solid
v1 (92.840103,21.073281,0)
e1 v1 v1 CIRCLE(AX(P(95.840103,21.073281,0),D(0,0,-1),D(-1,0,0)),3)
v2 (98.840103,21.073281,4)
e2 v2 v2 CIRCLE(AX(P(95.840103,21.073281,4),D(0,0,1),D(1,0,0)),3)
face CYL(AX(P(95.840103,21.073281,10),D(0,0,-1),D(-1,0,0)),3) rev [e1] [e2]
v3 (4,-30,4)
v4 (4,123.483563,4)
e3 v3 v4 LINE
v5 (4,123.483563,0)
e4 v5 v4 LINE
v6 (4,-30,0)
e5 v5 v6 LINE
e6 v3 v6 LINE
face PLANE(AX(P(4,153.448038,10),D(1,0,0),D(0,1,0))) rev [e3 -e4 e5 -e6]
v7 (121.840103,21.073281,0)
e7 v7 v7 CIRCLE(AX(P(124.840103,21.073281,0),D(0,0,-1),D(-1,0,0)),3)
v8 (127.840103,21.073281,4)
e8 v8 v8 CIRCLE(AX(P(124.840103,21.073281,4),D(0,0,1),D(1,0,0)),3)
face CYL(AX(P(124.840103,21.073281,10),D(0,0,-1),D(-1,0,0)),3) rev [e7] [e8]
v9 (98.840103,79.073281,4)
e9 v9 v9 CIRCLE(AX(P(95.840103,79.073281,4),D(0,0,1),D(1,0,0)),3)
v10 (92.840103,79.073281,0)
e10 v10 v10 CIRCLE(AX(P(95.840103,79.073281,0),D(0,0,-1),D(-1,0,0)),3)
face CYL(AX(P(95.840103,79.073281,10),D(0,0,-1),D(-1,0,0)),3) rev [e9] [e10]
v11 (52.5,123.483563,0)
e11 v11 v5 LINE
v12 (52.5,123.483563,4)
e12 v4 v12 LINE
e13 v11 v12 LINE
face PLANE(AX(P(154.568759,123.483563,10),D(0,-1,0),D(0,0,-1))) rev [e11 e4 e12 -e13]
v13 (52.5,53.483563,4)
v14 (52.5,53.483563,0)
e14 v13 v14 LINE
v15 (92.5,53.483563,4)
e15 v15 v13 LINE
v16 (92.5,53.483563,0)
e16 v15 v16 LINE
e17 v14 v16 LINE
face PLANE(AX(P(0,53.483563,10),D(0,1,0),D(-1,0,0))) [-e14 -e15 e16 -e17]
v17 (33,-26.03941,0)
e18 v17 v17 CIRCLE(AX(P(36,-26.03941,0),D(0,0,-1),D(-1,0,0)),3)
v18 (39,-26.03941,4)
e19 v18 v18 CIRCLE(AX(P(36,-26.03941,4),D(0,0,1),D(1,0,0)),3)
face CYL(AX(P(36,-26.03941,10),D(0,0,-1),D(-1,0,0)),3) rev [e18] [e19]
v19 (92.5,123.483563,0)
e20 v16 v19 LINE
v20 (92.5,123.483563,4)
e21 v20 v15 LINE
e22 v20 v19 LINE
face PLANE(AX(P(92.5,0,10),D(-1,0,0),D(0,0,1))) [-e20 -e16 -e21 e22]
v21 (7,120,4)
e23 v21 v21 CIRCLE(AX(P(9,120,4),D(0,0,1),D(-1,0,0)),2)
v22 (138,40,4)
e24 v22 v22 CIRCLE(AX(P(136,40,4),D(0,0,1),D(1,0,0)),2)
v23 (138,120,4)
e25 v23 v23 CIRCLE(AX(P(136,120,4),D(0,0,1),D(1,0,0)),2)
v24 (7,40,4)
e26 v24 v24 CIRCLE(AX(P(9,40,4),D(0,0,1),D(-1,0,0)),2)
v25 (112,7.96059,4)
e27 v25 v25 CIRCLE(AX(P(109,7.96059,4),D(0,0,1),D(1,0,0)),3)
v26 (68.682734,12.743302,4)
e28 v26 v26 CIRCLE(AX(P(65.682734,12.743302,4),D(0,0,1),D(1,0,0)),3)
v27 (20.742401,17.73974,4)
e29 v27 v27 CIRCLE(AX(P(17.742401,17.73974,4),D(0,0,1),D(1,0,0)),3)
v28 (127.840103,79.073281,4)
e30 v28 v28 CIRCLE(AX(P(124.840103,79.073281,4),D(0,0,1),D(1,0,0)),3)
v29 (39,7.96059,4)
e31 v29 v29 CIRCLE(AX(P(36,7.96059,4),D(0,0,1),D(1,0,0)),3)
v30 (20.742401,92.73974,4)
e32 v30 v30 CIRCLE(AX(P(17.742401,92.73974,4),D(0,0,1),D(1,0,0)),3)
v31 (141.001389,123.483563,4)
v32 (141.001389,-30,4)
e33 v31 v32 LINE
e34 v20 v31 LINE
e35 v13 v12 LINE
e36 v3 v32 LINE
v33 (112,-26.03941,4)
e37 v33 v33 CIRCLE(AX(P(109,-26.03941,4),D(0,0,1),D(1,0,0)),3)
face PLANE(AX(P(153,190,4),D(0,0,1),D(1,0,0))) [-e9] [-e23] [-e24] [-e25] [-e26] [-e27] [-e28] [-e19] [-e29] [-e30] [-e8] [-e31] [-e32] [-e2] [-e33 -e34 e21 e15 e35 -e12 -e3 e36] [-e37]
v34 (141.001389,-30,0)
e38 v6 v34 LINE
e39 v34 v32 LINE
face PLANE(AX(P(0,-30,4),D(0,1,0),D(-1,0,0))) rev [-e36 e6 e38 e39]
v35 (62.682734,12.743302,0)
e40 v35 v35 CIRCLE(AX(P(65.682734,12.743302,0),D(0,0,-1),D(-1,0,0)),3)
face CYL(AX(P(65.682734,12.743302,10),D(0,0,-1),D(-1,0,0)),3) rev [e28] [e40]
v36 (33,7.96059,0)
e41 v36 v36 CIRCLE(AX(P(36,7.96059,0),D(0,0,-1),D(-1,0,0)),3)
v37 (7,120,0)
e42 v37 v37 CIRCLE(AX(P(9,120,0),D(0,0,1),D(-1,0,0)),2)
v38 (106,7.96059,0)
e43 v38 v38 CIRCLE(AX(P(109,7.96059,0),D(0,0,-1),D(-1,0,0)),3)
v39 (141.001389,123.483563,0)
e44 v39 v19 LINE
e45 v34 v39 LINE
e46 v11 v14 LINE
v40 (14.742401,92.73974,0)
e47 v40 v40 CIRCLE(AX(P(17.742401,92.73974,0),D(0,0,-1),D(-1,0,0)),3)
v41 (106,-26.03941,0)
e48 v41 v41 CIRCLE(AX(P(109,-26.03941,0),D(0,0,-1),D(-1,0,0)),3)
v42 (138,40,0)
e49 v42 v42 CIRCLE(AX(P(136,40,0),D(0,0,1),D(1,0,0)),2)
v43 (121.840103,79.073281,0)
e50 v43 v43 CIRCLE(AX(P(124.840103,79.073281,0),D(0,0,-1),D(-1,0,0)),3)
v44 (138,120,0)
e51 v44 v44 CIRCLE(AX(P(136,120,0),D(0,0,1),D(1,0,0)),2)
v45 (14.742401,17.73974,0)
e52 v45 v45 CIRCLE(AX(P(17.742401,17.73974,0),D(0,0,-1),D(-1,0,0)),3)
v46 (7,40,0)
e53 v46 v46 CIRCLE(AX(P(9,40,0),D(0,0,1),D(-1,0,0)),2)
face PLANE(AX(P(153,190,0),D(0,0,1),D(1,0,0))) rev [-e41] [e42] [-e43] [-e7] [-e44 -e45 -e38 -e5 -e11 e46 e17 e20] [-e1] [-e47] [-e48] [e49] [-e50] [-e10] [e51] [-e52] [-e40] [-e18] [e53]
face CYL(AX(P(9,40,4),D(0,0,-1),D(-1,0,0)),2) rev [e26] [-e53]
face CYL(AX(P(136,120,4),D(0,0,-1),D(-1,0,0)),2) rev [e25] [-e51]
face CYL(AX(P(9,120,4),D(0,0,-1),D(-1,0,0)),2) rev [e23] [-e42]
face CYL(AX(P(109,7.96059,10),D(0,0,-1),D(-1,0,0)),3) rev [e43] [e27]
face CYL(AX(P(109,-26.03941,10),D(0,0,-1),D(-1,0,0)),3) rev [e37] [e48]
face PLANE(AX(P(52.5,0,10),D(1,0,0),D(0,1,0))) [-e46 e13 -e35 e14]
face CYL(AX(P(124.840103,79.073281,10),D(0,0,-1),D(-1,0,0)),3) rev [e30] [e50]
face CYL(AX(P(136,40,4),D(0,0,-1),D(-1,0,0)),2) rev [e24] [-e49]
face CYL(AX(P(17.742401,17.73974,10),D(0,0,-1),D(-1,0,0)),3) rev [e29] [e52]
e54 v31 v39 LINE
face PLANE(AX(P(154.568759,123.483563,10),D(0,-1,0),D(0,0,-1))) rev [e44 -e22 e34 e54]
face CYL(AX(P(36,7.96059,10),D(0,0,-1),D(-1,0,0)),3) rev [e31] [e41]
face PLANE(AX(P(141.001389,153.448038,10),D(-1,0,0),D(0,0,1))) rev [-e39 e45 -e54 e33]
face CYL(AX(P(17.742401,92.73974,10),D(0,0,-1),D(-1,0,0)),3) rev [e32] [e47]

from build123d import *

# Parameters (mm, degrees)
SKETCH_1_R          = 2
EXTRUDE_1_DEPTH     = 4
SKETCH_2_R          = 2
CUT_EXTRUDE_1_DEPTH = 26
EXTRUDE_3_DEPTH     = 4
FILLET_1_R          = 4
FILLET_2_R          = 4
SKETCH_5_W          = 10
SKETCH_5_H          = 14
EXTRUDE_4_DEPTH     = 4
FILLET_3_R          = 4
FILLET_1_2_DEPTH    = 4
CUT_EXTRUDE_2_DEPTH = 10
SKETCH_7_R          = 3
CUT_EXTRUDE_3_DEPTH = 10
CUT_EXTRUDE_4_DEPTH = 10
SKETCH_9_W          = 20
SKETCH_9_H          = 70
SKETCH_9_R          = 3
CUT_EXTRUDE_5_DEPTH = 10
CUT_EXTRUDE_6_DEPTH = 10


with BuildPart() as part:
    # 草图1 → 凸台-拉伸1 (new body)
    with BuildSketch(Plane.XY):
        with BuildLine():
            Line((0, -30), (0, 87))
            Line((0, 87), (-8, 87))
            Line((-8, 87), (-8, 95))
            Line((-8, 95), (0, 95))
            Line((0, 95), (0, 155))
            Line((0, 155), (-20, 155))
            Line((-20, 155), (-20, 180))
            Line((-20, 180), (-8, 180))
            ThreePointArc((-8, 180), (-0.928932188, 182.928932188), (2, 190))
            Line((2, 190), (2, 212))
            Line((2, 212), (10, 212))
            Line((10, 212), (10, 190))
            ThreePointArc((10, 190), (12.928932188, 182.928932188), (20, 180))
            Line((20, 180), (72.5, 180))
            Line((72.5, 180), (125, 180))
            ThreePointArc((125, 180), (132.071067812, 182.928932188), (135, 190))
            Line((135, 190), (135, 212))
            Line((135, 212), (143, 212))
            Line((143, 212), (143, 190))
            ThreePointArc((143, 190), (145.928932188, 182.928932188), (153, 180))
            Line((153, 180), (165, 180))
            Line((165, 180), (165, 155))
            Line((165, 155), (145, 155))
            Line((145, 155), (145, 95))
            Line((145, 95), (153, 95))
            Line((153, 95), (153, 87))
            Line((153, 87), (145, 87))
            Line((145, 87), (145, -30))
            Line((145, -30), (0, -30))
        make_face()
        with Locations((139, 208)):
            Circle(SKETCH_1_R, mode=Mode.SUBTRACT)
        with Locations(Location((149, 91, 0), (0, 0, 180))):
            Circle(SKETCH_1_R, mode=Mode.SUBTRACT)
        with Locations(Location((9, 40, 0), (0, 0, 180))):
            Circle(SKETCH_1_R, mode=Mode.SUBTRACT)
        with Locations(Location((9, 120, 0), (0, 0, 180))):
            Circle(SKETCH_1_R, mode=Mode.SUBTRACT)
        with Locations((-4, 91)):
            Circle(SKETCH_1_R, mode=Mode.SUBTRACT)
        with Locations(Location((6, 208, 0), (0, 0, 180))):
            Circle(SKETCH_1_R, mode=Mode.SUBTRACT)
        with Locations((136, 120)):
            Circle(SKETCH_1_R, mode=Mode.SUBTRACT)
        with Locations((136, 40)):
            Circle(SKETCH_1_R, mode=Mode.SUBTRACT)
    extrude(amount=EXTRUDE_1_DEPTH)

    # 草图2 → 切除-拉伸1 (cut)
    with BuildSketch(Plane(origin=(0, 0, 0), x_dir=(-1, 0, 0), z_dir=(0, 0, -1))):
        with Locations((-90.5, 176)):
            Circle(SKETCH_2_R)
        with Locations((-82.5, 176)):
            Circle(SKETCH_2_R)
        with Locations((-62.5, 176)):
            Circle(SKETCH_2_R)
        with Locations((-54.5, 176)):
            Circle(SKETCH_2_R)
    extrude(amount=-CUT_EXTRUDE_1_DEPTH, mode=Mode.SUBTRACT)

    # 草图4 → 凸台-拉伸3 (add)
    with BuildSketch(Plane(origin=(0, 0, 0), x_dir=(-1, 0, 0), z_dir=(0, 0, -1))):
        with BuildLine():
            Line((-102.5, 194), (-102.5, 204.972470671))
            Line((-102.5, 204.972470671), (-99, 215.944941341))
            Line((-99, 215.944941341), (-95.5, 215.944941341))
            ThreePointArc((-95.5, 215.944941341), (-92.121980777, 211.957020041), (-89.03099134, 207.742721229))
            ThreePointArc((-89.03099134, 207.742721229), (-72.5, 199), (-55.96900866, 207.742721229))
            ThreePointArc((-55.96900866, 207.742721229), (-52.878019223, 211.957020041), (-49.5, 215.944941341))
            Line((-49.5, 215.944941341), (-46, 215.944941341))
            Line((-46, 215.944941341), (-42.5, 204.972470671))
            Line((-42.5, 204.972470671), (-42.5, 194))
            Line((-42.5, 194), (-42.5, 180))
            Line((-42.5, 180), (-49.5, 180))
            Line((-49.5, 180), (-49.5, 194))
            Line((-49.5, 194), (-95.5, 194))
            Line((-95.5, 194), (-95.5, 180))
            Line((-95.5, 180), (-102.5, 180))
            Line((-102.5, 180), (-102.5, 194))
        make_face()
    extrude(amount=-EXTRUDE_3_DEPTH)

    # Fillet 1
    fillet_1_edges = [part.edges().sort_by_distance(p)[0] for p in [
        (102.5, 180, 2),
    ]]
    fillet(fillet_1_edges, radius=FILLET_1_R)

    # 圆角2
    fillet_2_edges = [part.edges().sort_by_distance(p)[0] for p in [
        (42.5, 180, 2),
    ]]
    fillet(fillet_2_edges, radius=FILLET_2_R)

    # 草图5 → 凸台-拉伸4 (add)
    with BuildSketch(Plane(origin=(0, 0, 0), x_dir=(-1, 0, 0), z_dir=(0, 0, -1))):
        with Locations((-71.485667886, 187)):
            Rectangle(SKETCH_5_W, SKETCH_5_H)
    extrude(amount=-EXTRUDE_4_DEPTH)

    # 圆角3
    fillet_3_edges = [part.edges().sort_by_distance(p)[0] for p in [
        (0, 95, 2),
    ]]
    fillet(fillet_3_edges, radius=FILLET_3_R)

    # Fillet 1 2: read off the stored shape, not the designer's step
    # Fillet 1 2 outline → Fillet 1 2 (add)
    with BuildSketch(Plane.XY):
        with BuildLine():
            add(Edge.make_bspline(
                [(0, 85), (0, 87), (-2, 87)],
                knots=[0, 0, 0, 1, 1, 1], degree=2, weights=[1, 0.707106781, 1]))
            Line((0, 85), (0, 87))
            Line((0, 87), (-2, 87))
        make_face()
        with BuildLine():
            add(Edge.make_bspline(
                [(145, 97), (145, 95), (147, 95)],
                knots=[0, 0, 0, 1, 1, 1], degree=2, weights=[1, 0.707106781, 1]))
            Line((145, 97), (145, 95))
            Line((145, 95), (147, 95))
        make_face()
        with BuildLine():
            add(Edge.make_bspline(
                [(147, 87), (145, 87), (145, 85)],
                knots=[0, 0, 0, 1, 1, 1], degree=2, weights=[1, 0.707106781, 1]))
            Line((147, 87), (145, 87))
            Line((145, 87), (145, 85))
        make_face()
    extrude(amount=FILLET_1_2_DEPTH)

    # 草图6 → 切除-拉伸2 (cut)
    with BuildSketch(Plane(origin=(0, 0, 0), x_dir=(-1, 0, 0), z_dir=(0, 0, -1))):
        with BuildLine():
            Line((-145, 126), (0, 127))
            ThreePointArc((0, 127), (86.5779564, 788.380122484), (-240.522742442, 207.067348009))
            Line((-240.522742442, 207.067348009), (-145, 126))
        make_face()
        Polygon((-145, 97), (-145, 85), (-184.843069779, 78.009614434), (-187.688323439, 115.332647741), align=None)
        Polygon((0, 85), (0, 99), (22.414932697, 115.332647741), (70.043948421, 78.009614434), align=None)
    extrude(amount=-CUT_EXTRUDE_2_DEPTH, mode=Mode.SUBTRACT)

    # 草图7 → 切除-拉伸3 (cut)
    with BuildSketch(Plane(origin=(0, 0, 0), x_dir=(-1, 0, 0), z_dir=(0, 0, -1))):
        with Locations((-109, 7.960589548)):
            Circle(SKETCH_7_R)
        with Locations((-36, 7.960589548)):
            Circle(SKETCH_7_R)
        with Locations((-109, -26.039410452)):
            Circle(SKETCH_7_R)
        with Locations((-36, -26.039410452)):
            Circle(SKETCH_7_R)
        with Locations((-124.840103492, 79.073280951)):
            Circle(SKETCH_7_R)
        with Locations((-124.840103492, 21.073280951)):
            Circle(SKETCH_7_R)
        with Locations((-95.840103492, 21.073280951)):
            Circle(SKETCH_7_R)
        with Locations((-95.840103492, 79.073280951)):
            Circle(SKETCH_7_R)
        with Locations((-65.68273437, 95.743302343)):
            Circle(SKETCH_7_R)
        with Locations((-65.68273437, 12.743302343)):
            Circle(SKETCH_7_R)
        with Locations((-17.742400545, 17.739740347)):
            Circle(SKETCH_7_R)
        with Locations((-17.742400545, 92.739740347)):
            Circle(SKETCH_7_R)
    extrude(amount=-CUT_EXTRUDE_3_DEPTH, mode=Mode.SUBTRACT)

    # 草图8 → 切除-拉伸4 (cut)
    with BuildSketch(Plane(origin=(0, 0, 0), x_dir=(-1, 0, 0), z_dir=(0, 0, -1))):
        Polygon((-154.568758674, 123.48356313), (9.260166048, 123.48356313), (22.383573851, 133.739706362), (-120.787265427, 138.710916059), align=None)
    extrude(amount=-CUT_EXTRUDE_4_DEPTH, mode=Mode.SUBTRACT)

    # 草图9 → 切除-拉伸5 (cut)
    # profile 1 of 2: a face of its own
    with BuildSketch(Plane(origin=(0, 0, 0), x_dir=(-1, 0, 0), z_dir=(0, 0, -1))):
        with Locations((-82.5, 88.48356313)):
            Rectangle(SKETCH_9_W, SKETCH_9_H)
    # profile 2 of 2: a face of its own
    with BuildSketch(Plane(origin=(0, 0, 0), x_dir=(-1, 0, 0), z_dir=(0, 0, -1))):
        with Locations((-62.5, 88.48356313)):
            Rectangle(SKETCH_9_W, SKETCH_9_H)
        with Locations((-65.68273437, 95.743302343)):
            Circle(SKETCH_9_R, mode=Mode.SUBTRACT)
    extrude(amount=-CUT_EXTRUDE_5_DEPTH, mode=Mode.SUBTRACT)

    # 草图10 → 切除-拉伸6 (cut)
    with BuildSketch(Plane(origin=(0, 0, 0), x_dir=(-1, 0, 0), z_dir=(0, 0, -1))):
        Polygon((-141.001388933, 153.448037881), (-141.001388933, -56.355097375), (-194.104207941, 53.872664694), align=None)
        Polygon((-4, 153.448037881), (-4, -50.760982065), (2.911690677, -47.431237796), (83.451298672, 119.6813615), align=None)
    extrude(amount=-CUT_EXTRUDE_6_DEPTH, mode=Mode.SUBTRACT)


solid = part.part
